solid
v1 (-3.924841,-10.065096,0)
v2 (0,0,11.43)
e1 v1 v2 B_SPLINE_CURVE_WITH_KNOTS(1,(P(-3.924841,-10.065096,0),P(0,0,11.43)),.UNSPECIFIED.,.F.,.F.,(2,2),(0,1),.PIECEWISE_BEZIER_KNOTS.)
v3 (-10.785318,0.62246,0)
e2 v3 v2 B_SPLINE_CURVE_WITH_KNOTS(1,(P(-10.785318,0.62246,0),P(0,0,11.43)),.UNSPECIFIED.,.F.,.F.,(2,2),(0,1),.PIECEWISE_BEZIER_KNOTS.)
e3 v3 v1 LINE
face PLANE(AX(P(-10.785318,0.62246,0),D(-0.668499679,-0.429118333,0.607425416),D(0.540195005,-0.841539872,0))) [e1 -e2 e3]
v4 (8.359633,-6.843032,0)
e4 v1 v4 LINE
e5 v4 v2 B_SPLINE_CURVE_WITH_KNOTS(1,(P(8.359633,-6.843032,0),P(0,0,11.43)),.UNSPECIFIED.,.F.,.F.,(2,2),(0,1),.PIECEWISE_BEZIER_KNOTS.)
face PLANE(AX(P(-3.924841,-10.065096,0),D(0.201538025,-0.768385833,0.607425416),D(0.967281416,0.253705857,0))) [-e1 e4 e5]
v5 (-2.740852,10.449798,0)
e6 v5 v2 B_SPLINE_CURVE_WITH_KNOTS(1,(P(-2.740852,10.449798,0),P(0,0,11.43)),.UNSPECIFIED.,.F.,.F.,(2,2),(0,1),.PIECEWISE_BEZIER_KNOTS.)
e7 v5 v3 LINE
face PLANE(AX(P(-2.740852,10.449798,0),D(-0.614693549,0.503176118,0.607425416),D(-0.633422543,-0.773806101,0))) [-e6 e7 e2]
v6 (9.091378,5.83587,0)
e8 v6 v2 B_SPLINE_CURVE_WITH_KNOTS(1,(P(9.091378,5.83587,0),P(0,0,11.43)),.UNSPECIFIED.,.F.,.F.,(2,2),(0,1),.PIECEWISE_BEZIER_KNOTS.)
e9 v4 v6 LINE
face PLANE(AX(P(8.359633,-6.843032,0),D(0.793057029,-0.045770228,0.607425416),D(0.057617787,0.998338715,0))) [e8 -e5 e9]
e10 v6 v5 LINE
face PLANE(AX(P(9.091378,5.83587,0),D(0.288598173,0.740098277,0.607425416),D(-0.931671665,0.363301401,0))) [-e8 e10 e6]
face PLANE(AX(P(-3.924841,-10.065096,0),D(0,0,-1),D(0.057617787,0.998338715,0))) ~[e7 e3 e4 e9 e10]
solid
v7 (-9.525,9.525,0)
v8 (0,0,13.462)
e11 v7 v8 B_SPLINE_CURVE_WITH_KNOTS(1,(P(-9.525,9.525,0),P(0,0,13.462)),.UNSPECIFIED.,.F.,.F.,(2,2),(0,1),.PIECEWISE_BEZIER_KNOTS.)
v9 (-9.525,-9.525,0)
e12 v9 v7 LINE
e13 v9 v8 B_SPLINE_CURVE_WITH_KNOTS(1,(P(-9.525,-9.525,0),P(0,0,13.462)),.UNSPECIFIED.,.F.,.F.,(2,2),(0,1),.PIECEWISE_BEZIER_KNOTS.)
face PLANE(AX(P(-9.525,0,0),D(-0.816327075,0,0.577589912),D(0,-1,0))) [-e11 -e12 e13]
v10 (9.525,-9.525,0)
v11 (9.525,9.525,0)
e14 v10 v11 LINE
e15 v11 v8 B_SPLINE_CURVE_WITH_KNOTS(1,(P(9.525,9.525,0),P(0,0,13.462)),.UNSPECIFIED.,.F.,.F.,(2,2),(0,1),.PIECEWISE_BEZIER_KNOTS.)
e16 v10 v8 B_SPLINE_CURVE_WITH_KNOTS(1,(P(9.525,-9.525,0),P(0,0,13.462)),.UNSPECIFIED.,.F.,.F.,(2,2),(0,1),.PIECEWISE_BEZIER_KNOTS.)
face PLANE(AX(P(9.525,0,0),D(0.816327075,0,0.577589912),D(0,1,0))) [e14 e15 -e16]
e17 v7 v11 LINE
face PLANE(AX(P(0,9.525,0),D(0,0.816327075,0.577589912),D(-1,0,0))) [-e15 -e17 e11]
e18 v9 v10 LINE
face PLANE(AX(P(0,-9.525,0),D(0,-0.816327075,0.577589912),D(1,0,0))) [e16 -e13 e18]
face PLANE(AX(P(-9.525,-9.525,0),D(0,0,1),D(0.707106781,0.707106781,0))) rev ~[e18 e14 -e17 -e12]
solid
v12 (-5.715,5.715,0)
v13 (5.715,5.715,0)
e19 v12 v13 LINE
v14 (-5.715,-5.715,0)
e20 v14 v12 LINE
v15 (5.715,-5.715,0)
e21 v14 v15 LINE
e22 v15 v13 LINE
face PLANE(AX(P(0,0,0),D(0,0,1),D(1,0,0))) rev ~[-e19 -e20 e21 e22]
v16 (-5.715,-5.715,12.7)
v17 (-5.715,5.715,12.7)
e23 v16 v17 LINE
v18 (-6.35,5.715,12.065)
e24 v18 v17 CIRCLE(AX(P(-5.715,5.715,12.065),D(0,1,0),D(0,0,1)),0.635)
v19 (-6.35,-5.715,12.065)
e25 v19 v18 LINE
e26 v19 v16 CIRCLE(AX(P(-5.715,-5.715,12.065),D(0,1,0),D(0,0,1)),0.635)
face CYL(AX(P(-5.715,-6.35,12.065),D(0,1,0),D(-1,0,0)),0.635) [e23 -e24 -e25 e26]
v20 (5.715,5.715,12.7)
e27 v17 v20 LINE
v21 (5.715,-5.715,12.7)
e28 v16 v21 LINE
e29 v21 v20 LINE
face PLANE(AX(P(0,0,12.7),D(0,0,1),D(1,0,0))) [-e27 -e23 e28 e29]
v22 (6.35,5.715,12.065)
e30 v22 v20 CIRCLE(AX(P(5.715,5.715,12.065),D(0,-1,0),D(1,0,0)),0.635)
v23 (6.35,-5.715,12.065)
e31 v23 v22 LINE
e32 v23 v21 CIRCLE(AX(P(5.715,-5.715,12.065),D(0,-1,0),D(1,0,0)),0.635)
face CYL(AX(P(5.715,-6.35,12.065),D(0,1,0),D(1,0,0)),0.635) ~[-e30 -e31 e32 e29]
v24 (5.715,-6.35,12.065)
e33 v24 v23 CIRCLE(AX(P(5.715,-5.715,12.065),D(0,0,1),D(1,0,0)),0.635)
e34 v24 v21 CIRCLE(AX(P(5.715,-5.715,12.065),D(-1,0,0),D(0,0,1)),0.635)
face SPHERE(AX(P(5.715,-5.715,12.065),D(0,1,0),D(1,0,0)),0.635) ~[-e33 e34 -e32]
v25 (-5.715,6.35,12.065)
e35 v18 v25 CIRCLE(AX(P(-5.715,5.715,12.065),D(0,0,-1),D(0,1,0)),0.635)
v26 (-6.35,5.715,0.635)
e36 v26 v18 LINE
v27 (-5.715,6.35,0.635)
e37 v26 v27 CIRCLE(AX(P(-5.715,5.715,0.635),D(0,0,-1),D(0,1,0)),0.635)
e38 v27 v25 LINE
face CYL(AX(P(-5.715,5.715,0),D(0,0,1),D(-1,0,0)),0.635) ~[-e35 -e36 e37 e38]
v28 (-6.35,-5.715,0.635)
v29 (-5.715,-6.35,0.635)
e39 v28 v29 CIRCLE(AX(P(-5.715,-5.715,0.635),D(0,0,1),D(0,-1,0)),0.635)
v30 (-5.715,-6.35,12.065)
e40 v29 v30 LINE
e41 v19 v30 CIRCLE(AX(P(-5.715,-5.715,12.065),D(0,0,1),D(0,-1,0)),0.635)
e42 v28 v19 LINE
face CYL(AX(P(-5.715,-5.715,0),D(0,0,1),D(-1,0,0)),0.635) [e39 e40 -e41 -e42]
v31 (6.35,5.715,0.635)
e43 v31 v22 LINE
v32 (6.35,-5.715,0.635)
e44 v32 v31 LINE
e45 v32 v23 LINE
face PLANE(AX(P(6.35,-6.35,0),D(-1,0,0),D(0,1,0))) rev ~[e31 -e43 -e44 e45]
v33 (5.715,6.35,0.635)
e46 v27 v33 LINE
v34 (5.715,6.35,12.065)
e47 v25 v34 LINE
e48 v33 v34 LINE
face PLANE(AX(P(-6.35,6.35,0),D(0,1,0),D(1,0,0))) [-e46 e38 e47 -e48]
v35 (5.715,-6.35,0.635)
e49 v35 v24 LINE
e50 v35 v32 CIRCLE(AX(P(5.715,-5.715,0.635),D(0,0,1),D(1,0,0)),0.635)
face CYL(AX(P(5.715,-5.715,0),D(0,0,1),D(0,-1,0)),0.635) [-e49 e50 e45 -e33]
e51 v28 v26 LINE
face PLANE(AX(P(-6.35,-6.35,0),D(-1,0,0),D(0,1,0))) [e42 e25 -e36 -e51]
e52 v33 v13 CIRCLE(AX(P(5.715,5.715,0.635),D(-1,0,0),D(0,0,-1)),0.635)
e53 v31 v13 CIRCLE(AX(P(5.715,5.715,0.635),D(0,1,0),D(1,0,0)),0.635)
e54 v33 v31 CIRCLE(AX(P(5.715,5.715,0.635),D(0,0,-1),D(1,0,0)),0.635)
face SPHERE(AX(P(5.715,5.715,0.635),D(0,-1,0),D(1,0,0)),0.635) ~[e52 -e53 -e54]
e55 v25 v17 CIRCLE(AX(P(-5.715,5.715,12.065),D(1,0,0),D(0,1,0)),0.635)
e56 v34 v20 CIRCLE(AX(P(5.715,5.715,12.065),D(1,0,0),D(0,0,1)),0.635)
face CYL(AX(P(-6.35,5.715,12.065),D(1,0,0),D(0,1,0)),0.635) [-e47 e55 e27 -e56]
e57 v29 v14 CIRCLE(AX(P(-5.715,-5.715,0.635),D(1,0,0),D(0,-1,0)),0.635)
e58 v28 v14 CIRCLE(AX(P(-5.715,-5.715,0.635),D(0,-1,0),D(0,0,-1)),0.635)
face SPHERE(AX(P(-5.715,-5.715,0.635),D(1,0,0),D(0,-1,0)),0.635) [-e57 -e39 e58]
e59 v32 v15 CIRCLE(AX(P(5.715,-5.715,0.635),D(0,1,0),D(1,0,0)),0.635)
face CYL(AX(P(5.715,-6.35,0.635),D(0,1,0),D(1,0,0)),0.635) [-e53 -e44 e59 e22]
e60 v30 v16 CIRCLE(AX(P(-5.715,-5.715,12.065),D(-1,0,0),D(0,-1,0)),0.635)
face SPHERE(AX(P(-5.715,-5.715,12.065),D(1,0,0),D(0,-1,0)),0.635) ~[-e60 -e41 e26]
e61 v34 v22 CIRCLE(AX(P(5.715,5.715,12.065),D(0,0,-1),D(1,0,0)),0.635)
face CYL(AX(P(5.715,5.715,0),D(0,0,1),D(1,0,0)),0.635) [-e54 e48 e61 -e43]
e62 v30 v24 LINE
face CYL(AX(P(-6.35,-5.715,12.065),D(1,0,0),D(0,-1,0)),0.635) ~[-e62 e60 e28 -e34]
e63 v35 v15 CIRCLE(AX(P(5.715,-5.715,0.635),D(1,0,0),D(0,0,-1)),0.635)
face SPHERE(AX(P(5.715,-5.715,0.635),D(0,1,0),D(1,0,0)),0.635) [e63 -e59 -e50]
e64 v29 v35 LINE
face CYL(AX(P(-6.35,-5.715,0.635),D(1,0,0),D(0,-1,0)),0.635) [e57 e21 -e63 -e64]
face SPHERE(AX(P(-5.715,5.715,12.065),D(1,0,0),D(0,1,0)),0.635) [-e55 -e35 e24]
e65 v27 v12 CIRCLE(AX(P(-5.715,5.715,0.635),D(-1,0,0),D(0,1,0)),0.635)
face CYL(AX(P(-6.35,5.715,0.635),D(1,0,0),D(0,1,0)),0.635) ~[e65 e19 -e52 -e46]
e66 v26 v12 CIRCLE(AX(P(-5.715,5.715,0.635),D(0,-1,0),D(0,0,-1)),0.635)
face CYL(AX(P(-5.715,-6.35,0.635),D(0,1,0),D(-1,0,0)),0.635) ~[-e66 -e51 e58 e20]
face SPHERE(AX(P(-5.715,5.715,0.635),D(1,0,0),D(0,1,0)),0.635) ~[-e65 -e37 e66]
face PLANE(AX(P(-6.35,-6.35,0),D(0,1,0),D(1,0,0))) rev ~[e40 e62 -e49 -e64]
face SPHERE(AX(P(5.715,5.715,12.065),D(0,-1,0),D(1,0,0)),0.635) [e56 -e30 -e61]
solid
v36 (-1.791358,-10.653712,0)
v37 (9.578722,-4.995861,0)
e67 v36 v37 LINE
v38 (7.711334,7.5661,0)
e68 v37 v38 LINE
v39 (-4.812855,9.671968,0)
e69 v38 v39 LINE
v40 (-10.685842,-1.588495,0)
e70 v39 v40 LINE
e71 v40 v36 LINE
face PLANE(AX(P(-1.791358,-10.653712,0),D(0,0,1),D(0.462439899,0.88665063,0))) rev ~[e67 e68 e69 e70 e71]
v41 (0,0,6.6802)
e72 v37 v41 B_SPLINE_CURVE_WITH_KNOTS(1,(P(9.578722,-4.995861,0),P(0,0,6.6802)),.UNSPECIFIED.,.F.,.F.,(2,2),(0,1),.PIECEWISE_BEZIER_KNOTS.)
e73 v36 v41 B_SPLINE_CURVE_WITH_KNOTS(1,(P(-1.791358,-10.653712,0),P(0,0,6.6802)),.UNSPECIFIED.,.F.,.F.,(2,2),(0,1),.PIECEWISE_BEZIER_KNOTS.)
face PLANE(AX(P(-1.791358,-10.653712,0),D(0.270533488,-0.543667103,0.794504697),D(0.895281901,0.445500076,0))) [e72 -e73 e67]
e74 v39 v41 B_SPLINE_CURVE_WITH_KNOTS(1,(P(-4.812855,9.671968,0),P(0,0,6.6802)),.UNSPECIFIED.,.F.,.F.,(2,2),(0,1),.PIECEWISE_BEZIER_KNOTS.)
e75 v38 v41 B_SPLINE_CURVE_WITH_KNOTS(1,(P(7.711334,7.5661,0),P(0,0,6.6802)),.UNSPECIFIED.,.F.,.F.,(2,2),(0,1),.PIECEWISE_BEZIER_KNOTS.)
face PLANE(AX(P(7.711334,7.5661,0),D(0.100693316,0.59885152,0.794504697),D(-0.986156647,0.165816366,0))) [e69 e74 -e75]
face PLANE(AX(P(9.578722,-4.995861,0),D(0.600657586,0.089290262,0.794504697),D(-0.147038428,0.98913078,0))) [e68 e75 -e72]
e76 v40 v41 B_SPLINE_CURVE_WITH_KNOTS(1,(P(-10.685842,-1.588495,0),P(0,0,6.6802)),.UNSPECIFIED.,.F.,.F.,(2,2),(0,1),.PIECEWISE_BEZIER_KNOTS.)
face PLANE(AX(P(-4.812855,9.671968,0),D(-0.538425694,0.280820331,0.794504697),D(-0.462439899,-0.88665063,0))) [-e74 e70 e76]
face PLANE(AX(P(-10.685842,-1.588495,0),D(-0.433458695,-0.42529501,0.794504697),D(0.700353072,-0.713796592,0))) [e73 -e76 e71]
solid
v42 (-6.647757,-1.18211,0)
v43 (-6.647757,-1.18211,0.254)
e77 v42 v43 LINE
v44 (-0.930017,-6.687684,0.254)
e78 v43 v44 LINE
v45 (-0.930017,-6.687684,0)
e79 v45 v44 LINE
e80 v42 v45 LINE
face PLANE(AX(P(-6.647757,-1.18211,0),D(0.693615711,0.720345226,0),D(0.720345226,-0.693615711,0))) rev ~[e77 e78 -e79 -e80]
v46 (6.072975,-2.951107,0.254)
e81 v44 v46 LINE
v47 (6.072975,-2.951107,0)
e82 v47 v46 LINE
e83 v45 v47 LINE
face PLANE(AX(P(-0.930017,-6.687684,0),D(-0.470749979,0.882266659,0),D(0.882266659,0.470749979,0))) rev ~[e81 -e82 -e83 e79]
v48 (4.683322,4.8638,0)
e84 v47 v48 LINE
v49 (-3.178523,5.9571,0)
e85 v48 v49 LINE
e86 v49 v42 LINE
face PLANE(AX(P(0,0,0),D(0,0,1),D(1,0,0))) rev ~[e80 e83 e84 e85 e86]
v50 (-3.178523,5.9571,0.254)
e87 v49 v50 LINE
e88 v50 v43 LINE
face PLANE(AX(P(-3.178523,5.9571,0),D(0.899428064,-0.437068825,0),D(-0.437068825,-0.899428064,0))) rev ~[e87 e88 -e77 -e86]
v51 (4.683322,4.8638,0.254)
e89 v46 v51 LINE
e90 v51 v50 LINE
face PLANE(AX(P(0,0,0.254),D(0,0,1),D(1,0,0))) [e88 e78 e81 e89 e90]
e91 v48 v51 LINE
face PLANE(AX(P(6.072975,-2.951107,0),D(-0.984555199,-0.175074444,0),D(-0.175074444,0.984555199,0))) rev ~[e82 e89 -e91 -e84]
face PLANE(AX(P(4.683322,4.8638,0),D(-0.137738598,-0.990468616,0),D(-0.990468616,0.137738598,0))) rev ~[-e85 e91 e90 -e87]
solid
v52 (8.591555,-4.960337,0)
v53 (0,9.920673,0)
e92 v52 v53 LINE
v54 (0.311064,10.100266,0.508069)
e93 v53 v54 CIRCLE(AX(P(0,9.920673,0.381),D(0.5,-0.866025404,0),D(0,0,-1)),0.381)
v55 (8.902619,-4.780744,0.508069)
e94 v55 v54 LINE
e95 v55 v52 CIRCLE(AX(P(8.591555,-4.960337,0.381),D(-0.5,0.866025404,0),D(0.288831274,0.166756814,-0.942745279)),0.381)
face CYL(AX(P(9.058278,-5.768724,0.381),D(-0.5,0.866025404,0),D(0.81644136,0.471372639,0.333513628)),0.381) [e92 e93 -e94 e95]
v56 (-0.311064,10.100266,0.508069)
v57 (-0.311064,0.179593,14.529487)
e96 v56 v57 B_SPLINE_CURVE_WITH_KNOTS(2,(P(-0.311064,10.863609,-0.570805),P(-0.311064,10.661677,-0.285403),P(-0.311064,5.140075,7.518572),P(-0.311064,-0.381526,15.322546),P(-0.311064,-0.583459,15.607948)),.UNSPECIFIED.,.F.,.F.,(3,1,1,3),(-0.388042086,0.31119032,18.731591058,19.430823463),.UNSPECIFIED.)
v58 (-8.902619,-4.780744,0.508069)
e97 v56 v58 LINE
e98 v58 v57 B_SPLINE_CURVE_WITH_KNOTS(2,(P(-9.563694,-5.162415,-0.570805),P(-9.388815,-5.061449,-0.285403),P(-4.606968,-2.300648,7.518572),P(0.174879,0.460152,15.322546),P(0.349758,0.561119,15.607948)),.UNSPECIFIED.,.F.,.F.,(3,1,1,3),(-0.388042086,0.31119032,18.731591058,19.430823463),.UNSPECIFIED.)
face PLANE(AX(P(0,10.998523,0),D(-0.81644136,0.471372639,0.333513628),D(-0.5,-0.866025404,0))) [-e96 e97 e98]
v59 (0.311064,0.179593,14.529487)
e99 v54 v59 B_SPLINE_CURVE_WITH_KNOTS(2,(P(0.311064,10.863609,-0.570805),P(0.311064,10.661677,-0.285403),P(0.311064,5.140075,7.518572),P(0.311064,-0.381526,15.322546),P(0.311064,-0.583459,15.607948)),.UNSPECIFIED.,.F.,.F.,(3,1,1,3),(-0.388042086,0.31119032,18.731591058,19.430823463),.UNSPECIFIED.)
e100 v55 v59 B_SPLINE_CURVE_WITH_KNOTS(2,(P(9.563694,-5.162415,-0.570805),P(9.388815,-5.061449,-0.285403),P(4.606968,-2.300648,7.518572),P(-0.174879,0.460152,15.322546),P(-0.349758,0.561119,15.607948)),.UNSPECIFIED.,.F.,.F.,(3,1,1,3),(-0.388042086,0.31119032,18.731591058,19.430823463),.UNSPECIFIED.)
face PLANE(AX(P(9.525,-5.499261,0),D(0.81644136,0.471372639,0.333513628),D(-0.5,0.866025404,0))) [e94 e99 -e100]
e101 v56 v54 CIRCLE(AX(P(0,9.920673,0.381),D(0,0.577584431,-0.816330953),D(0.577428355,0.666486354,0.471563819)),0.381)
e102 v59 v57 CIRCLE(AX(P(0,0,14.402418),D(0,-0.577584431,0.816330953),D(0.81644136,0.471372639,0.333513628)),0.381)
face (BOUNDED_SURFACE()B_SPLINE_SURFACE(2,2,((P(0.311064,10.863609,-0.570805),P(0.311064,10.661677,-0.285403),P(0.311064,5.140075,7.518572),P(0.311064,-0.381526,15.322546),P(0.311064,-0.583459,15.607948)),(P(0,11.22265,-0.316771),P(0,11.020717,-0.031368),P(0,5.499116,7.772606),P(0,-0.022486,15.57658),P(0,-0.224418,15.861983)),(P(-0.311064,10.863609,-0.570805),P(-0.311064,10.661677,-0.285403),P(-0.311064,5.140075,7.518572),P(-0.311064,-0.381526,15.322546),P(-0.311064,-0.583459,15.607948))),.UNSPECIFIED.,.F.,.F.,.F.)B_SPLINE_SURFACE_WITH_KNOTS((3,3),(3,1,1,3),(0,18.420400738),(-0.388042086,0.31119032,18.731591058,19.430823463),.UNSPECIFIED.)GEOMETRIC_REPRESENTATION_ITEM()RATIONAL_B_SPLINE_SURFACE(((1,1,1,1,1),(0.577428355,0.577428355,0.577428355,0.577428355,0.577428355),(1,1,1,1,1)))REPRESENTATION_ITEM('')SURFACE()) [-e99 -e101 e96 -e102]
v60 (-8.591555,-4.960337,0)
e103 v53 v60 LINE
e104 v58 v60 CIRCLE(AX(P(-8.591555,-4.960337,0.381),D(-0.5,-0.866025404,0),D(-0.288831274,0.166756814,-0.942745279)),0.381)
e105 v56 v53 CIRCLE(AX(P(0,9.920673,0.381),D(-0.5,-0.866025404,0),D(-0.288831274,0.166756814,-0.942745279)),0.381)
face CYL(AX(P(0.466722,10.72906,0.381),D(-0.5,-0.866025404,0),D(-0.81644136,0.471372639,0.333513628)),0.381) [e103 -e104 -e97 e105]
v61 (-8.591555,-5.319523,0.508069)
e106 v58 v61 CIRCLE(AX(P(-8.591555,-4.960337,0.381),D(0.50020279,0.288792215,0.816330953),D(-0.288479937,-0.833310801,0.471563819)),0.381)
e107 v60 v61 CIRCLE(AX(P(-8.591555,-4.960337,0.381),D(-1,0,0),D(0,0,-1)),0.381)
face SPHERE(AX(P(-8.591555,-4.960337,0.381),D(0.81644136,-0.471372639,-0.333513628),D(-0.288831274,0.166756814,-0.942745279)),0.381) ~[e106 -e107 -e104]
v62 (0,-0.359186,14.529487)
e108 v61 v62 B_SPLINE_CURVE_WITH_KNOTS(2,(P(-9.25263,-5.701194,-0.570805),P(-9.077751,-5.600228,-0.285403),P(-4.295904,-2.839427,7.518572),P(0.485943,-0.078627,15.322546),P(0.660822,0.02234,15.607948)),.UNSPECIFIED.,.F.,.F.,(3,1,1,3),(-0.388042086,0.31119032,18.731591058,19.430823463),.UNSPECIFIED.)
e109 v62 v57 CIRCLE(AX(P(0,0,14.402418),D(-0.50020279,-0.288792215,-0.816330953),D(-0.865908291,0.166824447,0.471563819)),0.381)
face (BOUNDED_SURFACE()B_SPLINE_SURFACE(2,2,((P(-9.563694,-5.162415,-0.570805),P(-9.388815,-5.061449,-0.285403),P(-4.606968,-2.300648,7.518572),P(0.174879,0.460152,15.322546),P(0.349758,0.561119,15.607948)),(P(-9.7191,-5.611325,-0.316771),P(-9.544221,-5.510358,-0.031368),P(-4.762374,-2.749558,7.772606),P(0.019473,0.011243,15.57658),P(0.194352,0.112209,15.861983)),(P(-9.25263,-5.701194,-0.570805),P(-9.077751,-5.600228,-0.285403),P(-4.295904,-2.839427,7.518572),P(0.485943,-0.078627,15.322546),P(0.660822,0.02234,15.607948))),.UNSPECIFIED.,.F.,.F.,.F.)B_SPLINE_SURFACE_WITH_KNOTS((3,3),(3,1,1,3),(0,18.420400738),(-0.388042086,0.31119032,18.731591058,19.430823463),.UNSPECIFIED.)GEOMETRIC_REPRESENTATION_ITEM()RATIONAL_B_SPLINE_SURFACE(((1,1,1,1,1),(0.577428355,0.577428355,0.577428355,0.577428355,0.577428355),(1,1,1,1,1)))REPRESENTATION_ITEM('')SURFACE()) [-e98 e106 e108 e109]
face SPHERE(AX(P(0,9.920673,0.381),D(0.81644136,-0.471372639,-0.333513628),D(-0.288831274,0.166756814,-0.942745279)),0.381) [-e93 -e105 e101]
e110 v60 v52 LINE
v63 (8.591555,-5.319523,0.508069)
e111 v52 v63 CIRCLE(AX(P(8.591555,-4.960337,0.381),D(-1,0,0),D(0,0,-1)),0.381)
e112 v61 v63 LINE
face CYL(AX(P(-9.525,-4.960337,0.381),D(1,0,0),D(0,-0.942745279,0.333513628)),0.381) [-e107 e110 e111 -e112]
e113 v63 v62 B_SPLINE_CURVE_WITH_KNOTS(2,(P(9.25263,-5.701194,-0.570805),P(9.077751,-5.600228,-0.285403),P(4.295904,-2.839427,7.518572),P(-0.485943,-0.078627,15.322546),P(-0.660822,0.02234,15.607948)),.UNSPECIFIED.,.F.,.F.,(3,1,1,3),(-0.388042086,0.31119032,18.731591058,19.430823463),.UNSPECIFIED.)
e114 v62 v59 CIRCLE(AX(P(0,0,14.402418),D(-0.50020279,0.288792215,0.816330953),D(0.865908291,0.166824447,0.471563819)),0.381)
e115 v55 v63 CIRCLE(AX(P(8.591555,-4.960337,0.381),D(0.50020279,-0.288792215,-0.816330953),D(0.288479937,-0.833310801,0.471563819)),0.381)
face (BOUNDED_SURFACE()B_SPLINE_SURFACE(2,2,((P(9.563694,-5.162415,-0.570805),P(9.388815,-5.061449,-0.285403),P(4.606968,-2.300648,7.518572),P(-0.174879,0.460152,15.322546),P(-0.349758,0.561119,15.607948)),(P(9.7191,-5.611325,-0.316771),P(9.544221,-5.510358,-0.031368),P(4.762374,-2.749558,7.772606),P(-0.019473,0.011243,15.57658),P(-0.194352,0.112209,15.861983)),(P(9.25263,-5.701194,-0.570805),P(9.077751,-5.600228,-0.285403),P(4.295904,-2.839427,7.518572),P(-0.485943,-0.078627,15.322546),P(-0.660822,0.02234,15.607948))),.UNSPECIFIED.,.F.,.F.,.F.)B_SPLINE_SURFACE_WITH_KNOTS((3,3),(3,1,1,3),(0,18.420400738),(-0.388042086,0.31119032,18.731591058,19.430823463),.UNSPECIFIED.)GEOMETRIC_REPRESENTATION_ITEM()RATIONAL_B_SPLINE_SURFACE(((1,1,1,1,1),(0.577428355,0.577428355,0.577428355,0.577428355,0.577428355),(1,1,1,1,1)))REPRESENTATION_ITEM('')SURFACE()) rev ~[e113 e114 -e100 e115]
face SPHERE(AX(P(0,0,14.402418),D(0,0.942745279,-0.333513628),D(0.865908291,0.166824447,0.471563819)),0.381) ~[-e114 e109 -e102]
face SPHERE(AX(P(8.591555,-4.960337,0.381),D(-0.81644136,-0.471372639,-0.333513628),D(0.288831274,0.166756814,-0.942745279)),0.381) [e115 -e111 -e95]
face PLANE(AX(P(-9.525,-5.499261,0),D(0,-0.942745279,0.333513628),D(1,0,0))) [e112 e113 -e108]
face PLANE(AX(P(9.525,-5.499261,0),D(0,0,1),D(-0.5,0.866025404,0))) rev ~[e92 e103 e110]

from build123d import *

# Parameters (mm, degrees)
F6_W      = 12.7
F6_H      = 12.7
F7_DEPTH  = 12.7
F8_R      = 0.635
F9_R      = 0.381
F10_W     = 19.05
F10_H     = 19.05
F14_DEPTH = 0.254
F16_DEPTH = 0.254


with BuildPart() as f2:
    # F0 (on Top) → F2 section 0
    with BuildSketch(Plane.XY, mode=Mode.PRIVATE) as f2_s0:
        Polygon((-1.791358188, -10.6537118532), (9.5787219576, -4.9958608935), (7.7113339266, 7.566100018), (-4.8128554924, 9.6719678669), (-10.6858422038, -1.5884951381), align=None)
    loft([f2_s0.sketch, Vertex(0, 0, 6.6802)])


with BuildPart() as f5:
    # F3 (on Top) → F5 section 0
    with BuildSketch(Plane.XY, mode=Mode.PRIVATE) as f5_s0:
        Polygon((9.525, -5.499261314), (0, 10.9985226281), (-9.525, -5.499261314), align=None)
    loft([f5_s0.sketch, Vertex(0, 0, 15.5448)])

    # F9
    f9_edges = [f5.edges().sort_by_distance(p)[0] for p in [
        (0, -5.499261, 0),
        (4.7625, 2.749631, 0),
        (-4.7625, 2.749631, 0),
        (0, 5.499261, 7.7724),
        (4.7625, -2.749631, 7.7724),
        (-4.7625, -2.749631, 7.7724),
    ]]
    fillet(f9_edges, radius=F9_R)


with BuildPart() as f7:
    # F6 (on Top) → F7 (new body)
    with BuildSketch(Plane.XY):
        Rectangle(F6_W, F6_H)
    extrude(amount=F7_DEPTH)

    # F8
    f8_edges = [f7.edges().sort_by_distance(p)[0] for p in [
        (6.35, 0, 12.7),
        (6.35, 0, 0),
        (6.35, 6.35, 6.35),
        (6.35, -6.35, 6.35),
        (0, 6.35, 12.7),
        (0, -6.35, 12.7),
        (0, -6.35, 0),
        (0, 6.35, 0),
        (-6.35, -6.35, 6.35),
        (-6.35, 6.35, 6.35),
        (-6.35, 0, 0),
        (-6.35, 0, 12.7),
    ]]
    fillet(f8_edges, radius=F8_R)


with BuildPart() as f12:
    # F10 (on Top) → F12 section 0
    with BuildSketch(Plane.XY, mode=Mode.PRIVATE) as f12_s0:
        Rectangle(F10_W, F10_H)
    loft([f12_s0.sketch, Vertex(0, 0, 13.462)])


with BuildPart() as f14:
    # F13 (on Top) → F14 (new body)
    with BuildSketch(Plane.XY):
        Polygon((-0.9300166294, -6.6876844959), (6.0729749752, -2.9511065379), (4.6833215769, 4.863800351), (-3.1785230604, 5.9571004693), (-6.6477568623, -1.1821097866), align=None)
    extrude(amount=F14_DEPTH)


with BuildPart() as f16:
    # F15 (on Top) → F16 (new body)
    with BuildSketch(Plane.XY):
        Polygon((-5.715, -5.0935079701), (0, -7.173597859), (5.715, -5.0935079701), (0, 8.701402141), align=None)
    extrude(amount=F16_DEPTH)


with BuildPart() as f19:
    # F17 (on Top) → F19 section 0
    with BuildSketch(Plane.XY, mode=Mode.PRIVATE) as f19_s0:
        Polygon((-3.9248414067, -10.0650961417), (8.3596325778, -6.8430317531), (9.0913784732, 5.8358699322), (-2.7408516767, 10.4497977251), (-10.7853179676, 0.6224602375), align=None)
    loft([f19_s0.sketch, Vertex(0, 0, 11.43)])


solid = Compound([f2.part, f5.part, f7.part, f12.part, f14.part, f19.part])
